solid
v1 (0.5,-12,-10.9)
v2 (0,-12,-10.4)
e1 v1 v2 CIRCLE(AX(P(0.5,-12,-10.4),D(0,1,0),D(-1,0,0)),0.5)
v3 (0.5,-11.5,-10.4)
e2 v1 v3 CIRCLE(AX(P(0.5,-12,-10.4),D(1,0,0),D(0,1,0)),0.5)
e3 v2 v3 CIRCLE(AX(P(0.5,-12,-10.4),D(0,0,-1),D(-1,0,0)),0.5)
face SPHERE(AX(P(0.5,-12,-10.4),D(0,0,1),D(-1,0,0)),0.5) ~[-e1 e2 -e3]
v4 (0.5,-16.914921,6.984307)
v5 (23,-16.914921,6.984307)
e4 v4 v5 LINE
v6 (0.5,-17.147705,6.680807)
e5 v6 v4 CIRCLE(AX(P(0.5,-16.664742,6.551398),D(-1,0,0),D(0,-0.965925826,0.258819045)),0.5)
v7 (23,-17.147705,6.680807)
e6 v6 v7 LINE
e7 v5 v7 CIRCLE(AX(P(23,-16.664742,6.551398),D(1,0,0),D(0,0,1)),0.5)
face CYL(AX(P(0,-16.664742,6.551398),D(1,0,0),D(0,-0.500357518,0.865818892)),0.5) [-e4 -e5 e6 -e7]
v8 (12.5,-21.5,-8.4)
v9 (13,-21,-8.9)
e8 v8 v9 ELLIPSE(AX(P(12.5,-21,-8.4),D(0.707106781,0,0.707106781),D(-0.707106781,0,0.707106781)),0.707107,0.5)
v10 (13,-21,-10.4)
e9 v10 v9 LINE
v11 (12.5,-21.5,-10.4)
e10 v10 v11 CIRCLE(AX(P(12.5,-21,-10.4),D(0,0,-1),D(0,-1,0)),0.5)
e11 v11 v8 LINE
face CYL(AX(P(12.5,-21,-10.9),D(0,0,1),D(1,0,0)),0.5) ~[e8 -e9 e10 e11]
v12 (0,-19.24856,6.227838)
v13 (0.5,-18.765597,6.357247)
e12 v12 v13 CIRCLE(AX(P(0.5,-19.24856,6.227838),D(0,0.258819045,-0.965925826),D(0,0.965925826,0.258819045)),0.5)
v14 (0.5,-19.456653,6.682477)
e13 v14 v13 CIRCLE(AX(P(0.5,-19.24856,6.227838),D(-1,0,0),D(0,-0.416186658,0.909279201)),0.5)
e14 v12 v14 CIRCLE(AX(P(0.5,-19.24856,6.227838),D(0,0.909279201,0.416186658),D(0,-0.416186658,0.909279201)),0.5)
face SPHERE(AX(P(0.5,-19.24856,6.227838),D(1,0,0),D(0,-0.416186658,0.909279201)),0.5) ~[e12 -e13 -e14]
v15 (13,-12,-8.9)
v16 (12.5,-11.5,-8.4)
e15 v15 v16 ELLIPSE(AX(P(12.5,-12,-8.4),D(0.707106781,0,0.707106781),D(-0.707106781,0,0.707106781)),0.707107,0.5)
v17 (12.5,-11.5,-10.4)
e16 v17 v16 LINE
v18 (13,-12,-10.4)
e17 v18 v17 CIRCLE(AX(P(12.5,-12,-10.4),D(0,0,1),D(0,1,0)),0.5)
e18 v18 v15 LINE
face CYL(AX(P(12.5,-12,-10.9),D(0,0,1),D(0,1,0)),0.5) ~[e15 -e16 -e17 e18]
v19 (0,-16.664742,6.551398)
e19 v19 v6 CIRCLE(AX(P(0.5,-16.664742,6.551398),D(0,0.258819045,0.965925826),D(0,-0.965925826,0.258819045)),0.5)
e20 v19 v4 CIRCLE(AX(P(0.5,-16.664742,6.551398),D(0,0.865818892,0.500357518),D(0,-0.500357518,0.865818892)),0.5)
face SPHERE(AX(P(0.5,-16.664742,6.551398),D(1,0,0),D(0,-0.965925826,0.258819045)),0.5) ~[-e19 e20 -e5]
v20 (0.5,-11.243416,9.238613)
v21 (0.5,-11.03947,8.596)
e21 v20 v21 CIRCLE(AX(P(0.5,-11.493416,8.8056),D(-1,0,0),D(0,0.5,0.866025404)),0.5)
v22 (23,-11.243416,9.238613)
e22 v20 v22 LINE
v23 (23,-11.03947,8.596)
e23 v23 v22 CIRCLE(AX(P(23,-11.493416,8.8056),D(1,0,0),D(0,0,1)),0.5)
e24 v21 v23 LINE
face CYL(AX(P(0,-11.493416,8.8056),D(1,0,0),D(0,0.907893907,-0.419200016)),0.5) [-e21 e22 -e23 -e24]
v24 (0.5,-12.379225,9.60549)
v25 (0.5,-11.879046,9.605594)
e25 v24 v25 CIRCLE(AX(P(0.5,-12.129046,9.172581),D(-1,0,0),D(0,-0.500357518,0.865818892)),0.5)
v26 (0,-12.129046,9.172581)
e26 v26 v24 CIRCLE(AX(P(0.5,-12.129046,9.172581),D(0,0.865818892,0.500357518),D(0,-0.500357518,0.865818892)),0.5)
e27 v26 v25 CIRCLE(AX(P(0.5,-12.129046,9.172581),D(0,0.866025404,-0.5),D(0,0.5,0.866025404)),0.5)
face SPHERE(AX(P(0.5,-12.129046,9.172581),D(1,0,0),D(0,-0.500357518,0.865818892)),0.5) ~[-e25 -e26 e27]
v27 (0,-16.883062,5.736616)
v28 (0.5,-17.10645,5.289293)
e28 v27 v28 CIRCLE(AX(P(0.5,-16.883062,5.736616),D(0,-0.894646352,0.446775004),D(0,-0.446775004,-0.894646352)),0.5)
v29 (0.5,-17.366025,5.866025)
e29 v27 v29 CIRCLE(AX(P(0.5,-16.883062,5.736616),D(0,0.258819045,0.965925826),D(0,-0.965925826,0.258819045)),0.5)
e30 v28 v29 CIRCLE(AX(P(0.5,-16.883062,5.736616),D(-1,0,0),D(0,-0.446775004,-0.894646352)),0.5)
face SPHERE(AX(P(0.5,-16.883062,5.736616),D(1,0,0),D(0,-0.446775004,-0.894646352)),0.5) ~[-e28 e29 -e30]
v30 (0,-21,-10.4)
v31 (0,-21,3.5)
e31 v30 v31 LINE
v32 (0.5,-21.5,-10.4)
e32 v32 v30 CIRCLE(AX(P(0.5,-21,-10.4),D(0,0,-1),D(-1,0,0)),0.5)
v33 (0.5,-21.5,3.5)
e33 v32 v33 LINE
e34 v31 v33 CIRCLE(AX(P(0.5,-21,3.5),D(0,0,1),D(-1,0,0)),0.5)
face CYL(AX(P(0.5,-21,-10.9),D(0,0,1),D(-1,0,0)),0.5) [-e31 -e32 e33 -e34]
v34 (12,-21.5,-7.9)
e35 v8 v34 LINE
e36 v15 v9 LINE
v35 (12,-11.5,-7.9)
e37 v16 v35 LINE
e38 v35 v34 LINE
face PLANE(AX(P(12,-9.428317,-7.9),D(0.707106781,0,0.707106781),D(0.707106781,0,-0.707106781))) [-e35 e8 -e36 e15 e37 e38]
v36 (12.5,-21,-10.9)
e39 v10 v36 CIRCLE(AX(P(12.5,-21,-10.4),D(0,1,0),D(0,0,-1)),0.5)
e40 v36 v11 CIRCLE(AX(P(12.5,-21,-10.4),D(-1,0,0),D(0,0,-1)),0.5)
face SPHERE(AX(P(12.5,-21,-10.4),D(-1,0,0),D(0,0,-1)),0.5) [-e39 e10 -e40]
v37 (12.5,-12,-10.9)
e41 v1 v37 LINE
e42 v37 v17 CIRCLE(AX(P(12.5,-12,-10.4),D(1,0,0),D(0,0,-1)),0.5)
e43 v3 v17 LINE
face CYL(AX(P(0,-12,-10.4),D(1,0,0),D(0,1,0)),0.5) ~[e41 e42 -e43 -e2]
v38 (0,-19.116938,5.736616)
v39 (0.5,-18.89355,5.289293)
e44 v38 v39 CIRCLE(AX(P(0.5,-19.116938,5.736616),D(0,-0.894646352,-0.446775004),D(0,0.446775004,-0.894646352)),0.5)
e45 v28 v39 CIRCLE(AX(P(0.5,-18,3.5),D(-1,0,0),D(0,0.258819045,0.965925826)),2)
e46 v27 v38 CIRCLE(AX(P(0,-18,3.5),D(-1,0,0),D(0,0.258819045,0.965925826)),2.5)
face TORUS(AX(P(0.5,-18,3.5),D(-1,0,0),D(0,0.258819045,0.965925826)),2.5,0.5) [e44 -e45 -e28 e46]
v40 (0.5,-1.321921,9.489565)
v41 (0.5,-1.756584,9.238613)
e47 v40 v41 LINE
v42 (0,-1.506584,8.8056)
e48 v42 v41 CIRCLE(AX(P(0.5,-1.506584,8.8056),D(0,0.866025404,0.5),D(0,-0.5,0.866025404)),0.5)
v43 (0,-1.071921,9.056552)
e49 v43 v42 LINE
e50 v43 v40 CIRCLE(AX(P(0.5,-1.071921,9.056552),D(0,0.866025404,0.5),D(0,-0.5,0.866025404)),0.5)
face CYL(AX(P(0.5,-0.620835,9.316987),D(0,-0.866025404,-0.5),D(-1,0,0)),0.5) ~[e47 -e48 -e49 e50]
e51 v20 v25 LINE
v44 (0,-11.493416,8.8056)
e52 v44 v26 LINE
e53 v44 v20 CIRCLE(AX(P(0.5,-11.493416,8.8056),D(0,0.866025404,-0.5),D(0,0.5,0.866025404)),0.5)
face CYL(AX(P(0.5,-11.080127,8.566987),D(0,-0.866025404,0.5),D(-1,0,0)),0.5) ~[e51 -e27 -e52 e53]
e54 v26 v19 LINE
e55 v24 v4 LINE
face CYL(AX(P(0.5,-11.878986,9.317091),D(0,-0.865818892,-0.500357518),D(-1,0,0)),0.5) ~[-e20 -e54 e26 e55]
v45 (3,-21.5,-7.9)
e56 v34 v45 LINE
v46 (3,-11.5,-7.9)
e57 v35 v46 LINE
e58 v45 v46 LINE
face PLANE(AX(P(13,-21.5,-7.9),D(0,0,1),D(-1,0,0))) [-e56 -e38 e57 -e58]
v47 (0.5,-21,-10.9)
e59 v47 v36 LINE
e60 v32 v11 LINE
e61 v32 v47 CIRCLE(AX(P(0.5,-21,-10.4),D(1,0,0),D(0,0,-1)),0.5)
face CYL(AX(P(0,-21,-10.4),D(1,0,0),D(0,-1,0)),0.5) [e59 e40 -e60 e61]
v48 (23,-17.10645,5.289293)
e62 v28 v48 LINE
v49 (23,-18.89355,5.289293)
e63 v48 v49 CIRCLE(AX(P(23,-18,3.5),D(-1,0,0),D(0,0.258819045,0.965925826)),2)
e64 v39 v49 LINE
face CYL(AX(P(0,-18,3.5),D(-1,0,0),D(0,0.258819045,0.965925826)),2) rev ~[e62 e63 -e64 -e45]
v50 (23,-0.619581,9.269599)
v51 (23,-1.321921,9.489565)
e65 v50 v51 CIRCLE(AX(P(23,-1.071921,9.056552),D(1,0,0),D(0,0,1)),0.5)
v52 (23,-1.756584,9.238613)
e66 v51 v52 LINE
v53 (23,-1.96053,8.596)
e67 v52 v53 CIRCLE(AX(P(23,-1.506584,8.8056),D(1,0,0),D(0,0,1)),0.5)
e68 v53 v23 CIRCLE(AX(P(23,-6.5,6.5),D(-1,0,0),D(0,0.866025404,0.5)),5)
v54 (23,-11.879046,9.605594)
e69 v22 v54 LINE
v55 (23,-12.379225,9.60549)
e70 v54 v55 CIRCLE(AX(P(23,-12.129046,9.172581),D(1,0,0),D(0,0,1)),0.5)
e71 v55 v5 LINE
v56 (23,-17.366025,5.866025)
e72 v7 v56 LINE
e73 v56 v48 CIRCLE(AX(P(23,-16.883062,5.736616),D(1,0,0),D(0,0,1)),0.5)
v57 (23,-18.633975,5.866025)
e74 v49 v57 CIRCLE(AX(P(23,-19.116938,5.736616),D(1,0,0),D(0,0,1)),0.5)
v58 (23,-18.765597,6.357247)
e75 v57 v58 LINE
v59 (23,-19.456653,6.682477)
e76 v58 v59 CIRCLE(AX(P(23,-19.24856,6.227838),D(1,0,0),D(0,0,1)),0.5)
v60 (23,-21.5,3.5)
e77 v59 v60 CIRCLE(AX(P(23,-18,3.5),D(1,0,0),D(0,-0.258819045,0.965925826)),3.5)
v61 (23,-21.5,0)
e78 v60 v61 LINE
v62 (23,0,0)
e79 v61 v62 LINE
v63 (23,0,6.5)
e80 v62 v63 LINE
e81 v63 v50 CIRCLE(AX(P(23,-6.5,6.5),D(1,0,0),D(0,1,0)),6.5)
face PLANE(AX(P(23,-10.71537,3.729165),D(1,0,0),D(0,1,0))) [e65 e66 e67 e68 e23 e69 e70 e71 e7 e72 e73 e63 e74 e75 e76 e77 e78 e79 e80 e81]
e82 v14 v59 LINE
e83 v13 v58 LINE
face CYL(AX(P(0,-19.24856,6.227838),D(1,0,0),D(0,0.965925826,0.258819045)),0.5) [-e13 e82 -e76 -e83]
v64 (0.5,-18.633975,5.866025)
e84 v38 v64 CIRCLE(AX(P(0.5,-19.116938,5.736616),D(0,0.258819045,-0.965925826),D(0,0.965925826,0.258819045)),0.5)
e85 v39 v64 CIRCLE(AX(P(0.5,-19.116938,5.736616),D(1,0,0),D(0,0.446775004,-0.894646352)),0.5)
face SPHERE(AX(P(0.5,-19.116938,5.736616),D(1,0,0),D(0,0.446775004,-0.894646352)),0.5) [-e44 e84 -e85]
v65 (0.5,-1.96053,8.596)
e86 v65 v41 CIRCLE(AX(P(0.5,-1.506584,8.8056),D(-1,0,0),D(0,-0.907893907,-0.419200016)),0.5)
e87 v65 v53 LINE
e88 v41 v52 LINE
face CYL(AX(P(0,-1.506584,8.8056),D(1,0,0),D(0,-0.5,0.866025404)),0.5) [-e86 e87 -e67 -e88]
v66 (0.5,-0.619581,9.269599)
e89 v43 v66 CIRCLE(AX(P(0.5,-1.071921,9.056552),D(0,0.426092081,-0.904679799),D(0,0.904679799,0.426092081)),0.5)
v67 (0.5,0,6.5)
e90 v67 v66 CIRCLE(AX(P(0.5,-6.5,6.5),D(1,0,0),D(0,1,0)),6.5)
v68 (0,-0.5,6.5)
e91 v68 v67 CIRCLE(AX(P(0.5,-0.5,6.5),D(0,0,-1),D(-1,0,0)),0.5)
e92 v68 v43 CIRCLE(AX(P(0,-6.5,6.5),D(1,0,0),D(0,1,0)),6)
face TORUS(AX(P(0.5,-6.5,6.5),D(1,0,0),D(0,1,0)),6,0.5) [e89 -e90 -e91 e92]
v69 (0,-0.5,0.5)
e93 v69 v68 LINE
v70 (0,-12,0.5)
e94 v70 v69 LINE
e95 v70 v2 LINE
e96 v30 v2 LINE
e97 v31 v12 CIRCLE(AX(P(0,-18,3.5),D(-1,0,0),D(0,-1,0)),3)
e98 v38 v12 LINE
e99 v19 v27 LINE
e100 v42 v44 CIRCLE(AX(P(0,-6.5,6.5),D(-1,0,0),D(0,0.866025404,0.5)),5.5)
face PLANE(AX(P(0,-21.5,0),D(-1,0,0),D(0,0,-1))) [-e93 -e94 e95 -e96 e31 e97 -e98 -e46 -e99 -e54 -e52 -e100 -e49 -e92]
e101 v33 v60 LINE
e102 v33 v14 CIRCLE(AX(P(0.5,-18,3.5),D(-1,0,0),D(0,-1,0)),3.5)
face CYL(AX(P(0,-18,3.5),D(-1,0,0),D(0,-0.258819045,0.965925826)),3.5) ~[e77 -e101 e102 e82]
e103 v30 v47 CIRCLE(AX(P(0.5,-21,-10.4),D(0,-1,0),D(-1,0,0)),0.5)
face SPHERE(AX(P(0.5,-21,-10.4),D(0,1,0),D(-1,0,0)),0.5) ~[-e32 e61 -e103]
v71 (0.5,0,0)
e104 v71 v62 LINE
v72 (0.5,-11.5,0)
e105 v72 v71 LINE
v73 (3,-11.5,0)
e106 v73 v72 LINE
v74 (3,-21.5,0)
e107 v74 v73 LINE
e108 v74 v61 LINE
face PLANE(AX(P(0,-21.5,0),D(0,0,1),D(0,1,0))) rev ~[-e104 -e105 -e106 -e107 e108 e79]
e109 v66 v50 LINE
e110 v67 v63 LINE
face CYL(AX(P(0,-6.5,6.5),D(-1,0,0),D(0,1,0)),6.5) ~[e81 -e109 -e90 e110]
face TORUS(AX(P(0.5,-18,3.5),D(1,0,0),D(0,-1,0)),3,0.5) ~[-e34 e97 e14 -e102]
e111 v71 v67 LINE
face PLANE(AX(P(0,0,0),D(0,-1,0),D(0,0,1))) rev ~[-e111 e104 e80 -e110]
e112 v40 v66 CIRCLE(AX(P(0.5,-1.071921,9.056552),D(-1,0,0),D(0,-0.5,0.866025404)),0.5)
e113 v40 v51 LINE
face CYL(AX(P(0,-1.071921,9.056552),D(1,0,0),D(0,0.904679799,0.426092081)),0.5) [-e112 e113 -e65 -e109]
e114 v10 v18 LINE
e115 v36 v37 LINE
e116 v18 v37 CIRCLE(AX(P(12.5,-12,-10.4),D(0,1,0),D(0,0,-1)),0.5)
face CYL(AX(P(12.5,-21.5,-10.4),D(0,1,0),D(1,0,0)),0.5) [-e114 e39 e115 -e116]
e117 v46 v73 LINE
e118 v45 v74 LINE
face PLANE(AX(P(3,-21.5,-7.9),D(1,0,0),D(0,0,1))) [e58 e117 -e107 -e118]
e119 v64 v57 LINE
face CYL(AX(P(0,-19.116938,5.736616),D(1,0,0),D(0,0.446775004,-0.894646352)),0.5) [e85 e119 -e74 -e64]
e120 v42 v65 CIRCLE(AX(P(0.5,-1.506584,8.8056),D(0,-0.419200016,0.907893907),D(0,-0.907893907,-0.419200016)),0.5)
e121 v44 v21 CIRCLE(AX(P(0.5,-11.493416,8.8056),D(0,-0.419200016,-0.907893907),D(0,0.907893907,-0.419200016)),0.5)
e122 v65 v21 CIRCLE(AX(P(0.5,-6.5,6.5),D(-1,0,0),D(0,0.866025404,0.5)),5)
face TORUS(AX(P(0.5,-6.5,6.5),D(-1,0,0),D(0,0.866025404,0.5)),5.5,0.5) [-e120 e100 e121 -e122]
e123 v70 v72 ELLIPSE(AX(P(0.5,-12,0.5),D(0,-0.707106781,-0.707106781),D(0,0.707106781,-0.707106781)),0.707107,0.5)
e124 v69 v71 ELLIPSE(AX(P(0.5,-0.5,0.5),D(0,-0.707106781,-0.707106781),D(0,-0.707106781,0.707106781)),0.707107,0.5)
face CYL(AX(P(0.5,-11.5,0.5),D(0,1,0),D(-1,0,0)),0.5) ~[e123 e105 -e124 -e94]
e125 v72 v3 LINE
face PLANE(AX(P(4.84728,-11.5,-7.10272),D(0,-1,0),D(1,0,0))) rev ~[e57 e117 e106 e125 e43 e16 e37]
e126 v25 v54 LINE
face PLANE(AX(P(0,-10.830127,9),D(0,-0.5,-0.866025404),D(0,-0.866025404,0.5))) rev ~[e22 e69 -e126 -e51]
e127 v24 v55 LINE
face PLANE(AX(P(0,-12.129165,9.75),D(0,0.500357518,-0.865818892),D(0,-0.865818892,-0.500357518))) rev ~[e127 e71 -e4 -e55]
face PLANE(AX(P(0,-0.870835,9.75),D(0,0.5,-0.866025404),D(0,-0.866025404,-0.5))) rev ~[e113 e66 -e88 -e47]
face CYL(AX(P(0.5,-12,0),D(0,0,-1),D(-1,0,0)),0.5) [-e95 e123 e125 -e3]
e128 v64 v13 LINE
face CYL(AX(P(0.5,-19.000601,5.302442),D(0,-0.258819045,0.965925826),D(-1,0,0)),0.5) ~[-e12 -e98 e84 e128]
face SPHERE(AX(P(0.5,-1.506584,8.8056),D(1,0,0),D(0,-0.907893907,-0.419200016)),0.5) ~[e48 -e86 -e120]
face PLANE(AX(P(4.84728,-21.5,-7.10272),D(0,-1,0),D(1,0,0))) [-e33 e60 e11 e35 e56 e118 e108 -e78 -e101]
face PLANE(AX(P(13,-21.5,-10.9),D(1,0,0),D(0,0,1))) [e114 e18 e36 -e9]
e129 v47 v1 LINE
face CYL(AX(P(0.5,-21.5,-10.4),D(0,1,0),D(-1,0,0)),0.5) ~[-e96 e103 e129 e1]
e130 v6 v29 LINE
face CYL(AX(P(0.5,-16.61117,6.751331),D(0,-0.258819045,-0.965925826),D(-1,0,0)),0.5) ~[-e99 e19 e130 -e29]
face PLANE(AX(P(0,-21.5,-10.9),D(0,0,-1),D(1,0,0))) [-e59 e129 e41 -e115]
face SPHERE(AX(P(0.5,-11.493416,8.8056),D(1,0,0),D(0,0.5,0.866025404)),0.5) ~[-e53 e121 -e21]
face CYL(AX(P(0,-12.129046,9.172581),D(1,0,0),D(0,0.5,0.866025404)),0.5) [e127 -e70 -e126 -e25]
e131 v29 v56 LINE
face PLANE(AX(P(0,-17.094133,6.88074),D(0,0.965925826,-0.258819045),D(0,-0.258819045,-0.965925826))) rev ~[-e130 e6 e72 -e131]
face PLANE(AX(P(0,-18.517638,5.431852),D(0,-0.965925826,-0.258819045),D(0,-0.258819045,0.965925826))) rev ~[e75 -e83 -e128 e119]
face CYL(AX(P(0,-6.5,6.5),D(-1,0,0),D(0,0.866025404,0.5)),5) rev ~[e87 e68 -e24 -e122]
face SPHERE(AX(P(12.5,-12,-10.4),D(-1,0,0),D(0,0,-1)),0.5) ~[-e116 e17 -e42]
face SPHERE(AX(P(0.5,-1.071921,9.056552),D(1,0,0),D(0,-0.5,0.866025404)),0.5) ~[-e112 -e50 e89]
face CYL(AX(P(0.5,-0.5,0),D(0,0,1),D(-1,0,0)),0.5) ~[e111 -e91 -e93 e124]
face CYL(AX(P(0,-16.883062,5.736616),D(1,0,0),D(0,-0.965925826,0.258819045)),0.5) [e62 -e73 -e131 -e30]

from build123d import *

# Parameters (mm, degrees)
F1_DEPTH    = 23
F3_DEPTH    = 10
F4_R        = 0.5
F5_T1_DEPTH = 14.1433659759


# Not quite as in the source:
# - a fillet or chamfer that OpenCascade refuses, or shapes differently, is made with other operations: its cross-section is extruded or revolved along the edge and cut away or added


with BuildPart() as f1:
    # F0 (on Right) → F1 (new body)
    with BuildSketch(Plane.YZ):
        with BuildLine():
            Line((-21.5, 0), (0, 0))
            Line((0, 0), (0, 6.5))
            ThreePointArc((0, 6.5), (-0.2214821291, 8.1823237932), (-0.8708348754, 9.75))
            Line((-0.8708348754, 9.75), (-2.1698729811, 9))
            ThreePointArc((-2.1698729811, 9), (-6.5, 1.5), (-10.8301270189, 9))
            Line((-10.8301270189, 9), (-12.1291651246, 9.75))
            Line((-12.1291651246, 9.75), (-17.0941333421, 6.880740392))
            Line((-17.0941333421, 6.880740392), (-17.4823619098, 5.4318516526))
            ThreePointArc((-17.4823619098, 5.4318516526), (-18, 1.5), (-18.5176380902, 5.4318516526))
            Line((-18.5176380902, 5.4318516526), (-18.9058666579, 6.880740392))
            ThreePointArc((-18.9058666579, 6.880740392), (-20.776736691, 5.6306650015), (-21.5, 3.5))
            Line((-21.5, 3.5), (-21.5, 0))
        make_face()
    extrude(amount=F1_DEPTH)

    # F2 (on face) → F3 (join)
    with BuildSketch(Plane.XZ.offset(21.5)):
        Polygon((3, 0), (0, 0), (0, -10.9), (13, -10.9), (13, -7.9), (3, -7.9), align=None)
    extrude(amount=-F3_DEPTH)

    # F4
    f4_edges = [f1.edges().sort_by_distance(p)[0] for p in [
        (0, -18, 1.5),
        (0, -17.288248, 6.156296),
        (0, -14.611649, 8.31537),
        (0, -11.479646, 9.375),
        (0, -6.5, 1.5),
        (0, -1.520354, 9.375),
        (0, 0, 3.25),
        (0, -5.75, 0),
        (0, -11.5, -5.45),
        (0, -16.5, -10.9),
        (0, -21.5, -3.7),
        (0, -18.711752, 6.156296),
        (6.5, -21.5, -10.9),
        (6.5, -11.5, -10.9),
        (13, -16.5, -10.9),
        (13, -11.5, -9.4),
        (13, -21.5, -9.4),
        (11.5, -17.482362, 5.431852),
        (11.5, -17.094133, 6.88074),
        (11.5, -18.517638, 5.431852),
        (11.5, -18.905867, 6.88074),
        (11.5, -12.129165, 9.75),
        (11.5, -10.830127, 9),
        (11.5, -2.169873, 9),
        (11.5, -0.870835, 9.75),
        (0, -20.776737, 5.630665),
        (0, -0.221482, 8.182324),
    ]]
    fillet(f4_edges, radius=F4_R)

    # F5: chamfer of 1 on 1 edges, made by hand

    # F5_s2 → F5_t1 (cut)
    with BuildSketch(Plane.XZ.offset(9.428317012)):
        Polygon((12, -7.9), (13, -8.9), (13, -7.9), align=None)
    extrude(amount=F5_T1_DEPTH, mode=Mode.SUBTRACT)


solid = f1.part
